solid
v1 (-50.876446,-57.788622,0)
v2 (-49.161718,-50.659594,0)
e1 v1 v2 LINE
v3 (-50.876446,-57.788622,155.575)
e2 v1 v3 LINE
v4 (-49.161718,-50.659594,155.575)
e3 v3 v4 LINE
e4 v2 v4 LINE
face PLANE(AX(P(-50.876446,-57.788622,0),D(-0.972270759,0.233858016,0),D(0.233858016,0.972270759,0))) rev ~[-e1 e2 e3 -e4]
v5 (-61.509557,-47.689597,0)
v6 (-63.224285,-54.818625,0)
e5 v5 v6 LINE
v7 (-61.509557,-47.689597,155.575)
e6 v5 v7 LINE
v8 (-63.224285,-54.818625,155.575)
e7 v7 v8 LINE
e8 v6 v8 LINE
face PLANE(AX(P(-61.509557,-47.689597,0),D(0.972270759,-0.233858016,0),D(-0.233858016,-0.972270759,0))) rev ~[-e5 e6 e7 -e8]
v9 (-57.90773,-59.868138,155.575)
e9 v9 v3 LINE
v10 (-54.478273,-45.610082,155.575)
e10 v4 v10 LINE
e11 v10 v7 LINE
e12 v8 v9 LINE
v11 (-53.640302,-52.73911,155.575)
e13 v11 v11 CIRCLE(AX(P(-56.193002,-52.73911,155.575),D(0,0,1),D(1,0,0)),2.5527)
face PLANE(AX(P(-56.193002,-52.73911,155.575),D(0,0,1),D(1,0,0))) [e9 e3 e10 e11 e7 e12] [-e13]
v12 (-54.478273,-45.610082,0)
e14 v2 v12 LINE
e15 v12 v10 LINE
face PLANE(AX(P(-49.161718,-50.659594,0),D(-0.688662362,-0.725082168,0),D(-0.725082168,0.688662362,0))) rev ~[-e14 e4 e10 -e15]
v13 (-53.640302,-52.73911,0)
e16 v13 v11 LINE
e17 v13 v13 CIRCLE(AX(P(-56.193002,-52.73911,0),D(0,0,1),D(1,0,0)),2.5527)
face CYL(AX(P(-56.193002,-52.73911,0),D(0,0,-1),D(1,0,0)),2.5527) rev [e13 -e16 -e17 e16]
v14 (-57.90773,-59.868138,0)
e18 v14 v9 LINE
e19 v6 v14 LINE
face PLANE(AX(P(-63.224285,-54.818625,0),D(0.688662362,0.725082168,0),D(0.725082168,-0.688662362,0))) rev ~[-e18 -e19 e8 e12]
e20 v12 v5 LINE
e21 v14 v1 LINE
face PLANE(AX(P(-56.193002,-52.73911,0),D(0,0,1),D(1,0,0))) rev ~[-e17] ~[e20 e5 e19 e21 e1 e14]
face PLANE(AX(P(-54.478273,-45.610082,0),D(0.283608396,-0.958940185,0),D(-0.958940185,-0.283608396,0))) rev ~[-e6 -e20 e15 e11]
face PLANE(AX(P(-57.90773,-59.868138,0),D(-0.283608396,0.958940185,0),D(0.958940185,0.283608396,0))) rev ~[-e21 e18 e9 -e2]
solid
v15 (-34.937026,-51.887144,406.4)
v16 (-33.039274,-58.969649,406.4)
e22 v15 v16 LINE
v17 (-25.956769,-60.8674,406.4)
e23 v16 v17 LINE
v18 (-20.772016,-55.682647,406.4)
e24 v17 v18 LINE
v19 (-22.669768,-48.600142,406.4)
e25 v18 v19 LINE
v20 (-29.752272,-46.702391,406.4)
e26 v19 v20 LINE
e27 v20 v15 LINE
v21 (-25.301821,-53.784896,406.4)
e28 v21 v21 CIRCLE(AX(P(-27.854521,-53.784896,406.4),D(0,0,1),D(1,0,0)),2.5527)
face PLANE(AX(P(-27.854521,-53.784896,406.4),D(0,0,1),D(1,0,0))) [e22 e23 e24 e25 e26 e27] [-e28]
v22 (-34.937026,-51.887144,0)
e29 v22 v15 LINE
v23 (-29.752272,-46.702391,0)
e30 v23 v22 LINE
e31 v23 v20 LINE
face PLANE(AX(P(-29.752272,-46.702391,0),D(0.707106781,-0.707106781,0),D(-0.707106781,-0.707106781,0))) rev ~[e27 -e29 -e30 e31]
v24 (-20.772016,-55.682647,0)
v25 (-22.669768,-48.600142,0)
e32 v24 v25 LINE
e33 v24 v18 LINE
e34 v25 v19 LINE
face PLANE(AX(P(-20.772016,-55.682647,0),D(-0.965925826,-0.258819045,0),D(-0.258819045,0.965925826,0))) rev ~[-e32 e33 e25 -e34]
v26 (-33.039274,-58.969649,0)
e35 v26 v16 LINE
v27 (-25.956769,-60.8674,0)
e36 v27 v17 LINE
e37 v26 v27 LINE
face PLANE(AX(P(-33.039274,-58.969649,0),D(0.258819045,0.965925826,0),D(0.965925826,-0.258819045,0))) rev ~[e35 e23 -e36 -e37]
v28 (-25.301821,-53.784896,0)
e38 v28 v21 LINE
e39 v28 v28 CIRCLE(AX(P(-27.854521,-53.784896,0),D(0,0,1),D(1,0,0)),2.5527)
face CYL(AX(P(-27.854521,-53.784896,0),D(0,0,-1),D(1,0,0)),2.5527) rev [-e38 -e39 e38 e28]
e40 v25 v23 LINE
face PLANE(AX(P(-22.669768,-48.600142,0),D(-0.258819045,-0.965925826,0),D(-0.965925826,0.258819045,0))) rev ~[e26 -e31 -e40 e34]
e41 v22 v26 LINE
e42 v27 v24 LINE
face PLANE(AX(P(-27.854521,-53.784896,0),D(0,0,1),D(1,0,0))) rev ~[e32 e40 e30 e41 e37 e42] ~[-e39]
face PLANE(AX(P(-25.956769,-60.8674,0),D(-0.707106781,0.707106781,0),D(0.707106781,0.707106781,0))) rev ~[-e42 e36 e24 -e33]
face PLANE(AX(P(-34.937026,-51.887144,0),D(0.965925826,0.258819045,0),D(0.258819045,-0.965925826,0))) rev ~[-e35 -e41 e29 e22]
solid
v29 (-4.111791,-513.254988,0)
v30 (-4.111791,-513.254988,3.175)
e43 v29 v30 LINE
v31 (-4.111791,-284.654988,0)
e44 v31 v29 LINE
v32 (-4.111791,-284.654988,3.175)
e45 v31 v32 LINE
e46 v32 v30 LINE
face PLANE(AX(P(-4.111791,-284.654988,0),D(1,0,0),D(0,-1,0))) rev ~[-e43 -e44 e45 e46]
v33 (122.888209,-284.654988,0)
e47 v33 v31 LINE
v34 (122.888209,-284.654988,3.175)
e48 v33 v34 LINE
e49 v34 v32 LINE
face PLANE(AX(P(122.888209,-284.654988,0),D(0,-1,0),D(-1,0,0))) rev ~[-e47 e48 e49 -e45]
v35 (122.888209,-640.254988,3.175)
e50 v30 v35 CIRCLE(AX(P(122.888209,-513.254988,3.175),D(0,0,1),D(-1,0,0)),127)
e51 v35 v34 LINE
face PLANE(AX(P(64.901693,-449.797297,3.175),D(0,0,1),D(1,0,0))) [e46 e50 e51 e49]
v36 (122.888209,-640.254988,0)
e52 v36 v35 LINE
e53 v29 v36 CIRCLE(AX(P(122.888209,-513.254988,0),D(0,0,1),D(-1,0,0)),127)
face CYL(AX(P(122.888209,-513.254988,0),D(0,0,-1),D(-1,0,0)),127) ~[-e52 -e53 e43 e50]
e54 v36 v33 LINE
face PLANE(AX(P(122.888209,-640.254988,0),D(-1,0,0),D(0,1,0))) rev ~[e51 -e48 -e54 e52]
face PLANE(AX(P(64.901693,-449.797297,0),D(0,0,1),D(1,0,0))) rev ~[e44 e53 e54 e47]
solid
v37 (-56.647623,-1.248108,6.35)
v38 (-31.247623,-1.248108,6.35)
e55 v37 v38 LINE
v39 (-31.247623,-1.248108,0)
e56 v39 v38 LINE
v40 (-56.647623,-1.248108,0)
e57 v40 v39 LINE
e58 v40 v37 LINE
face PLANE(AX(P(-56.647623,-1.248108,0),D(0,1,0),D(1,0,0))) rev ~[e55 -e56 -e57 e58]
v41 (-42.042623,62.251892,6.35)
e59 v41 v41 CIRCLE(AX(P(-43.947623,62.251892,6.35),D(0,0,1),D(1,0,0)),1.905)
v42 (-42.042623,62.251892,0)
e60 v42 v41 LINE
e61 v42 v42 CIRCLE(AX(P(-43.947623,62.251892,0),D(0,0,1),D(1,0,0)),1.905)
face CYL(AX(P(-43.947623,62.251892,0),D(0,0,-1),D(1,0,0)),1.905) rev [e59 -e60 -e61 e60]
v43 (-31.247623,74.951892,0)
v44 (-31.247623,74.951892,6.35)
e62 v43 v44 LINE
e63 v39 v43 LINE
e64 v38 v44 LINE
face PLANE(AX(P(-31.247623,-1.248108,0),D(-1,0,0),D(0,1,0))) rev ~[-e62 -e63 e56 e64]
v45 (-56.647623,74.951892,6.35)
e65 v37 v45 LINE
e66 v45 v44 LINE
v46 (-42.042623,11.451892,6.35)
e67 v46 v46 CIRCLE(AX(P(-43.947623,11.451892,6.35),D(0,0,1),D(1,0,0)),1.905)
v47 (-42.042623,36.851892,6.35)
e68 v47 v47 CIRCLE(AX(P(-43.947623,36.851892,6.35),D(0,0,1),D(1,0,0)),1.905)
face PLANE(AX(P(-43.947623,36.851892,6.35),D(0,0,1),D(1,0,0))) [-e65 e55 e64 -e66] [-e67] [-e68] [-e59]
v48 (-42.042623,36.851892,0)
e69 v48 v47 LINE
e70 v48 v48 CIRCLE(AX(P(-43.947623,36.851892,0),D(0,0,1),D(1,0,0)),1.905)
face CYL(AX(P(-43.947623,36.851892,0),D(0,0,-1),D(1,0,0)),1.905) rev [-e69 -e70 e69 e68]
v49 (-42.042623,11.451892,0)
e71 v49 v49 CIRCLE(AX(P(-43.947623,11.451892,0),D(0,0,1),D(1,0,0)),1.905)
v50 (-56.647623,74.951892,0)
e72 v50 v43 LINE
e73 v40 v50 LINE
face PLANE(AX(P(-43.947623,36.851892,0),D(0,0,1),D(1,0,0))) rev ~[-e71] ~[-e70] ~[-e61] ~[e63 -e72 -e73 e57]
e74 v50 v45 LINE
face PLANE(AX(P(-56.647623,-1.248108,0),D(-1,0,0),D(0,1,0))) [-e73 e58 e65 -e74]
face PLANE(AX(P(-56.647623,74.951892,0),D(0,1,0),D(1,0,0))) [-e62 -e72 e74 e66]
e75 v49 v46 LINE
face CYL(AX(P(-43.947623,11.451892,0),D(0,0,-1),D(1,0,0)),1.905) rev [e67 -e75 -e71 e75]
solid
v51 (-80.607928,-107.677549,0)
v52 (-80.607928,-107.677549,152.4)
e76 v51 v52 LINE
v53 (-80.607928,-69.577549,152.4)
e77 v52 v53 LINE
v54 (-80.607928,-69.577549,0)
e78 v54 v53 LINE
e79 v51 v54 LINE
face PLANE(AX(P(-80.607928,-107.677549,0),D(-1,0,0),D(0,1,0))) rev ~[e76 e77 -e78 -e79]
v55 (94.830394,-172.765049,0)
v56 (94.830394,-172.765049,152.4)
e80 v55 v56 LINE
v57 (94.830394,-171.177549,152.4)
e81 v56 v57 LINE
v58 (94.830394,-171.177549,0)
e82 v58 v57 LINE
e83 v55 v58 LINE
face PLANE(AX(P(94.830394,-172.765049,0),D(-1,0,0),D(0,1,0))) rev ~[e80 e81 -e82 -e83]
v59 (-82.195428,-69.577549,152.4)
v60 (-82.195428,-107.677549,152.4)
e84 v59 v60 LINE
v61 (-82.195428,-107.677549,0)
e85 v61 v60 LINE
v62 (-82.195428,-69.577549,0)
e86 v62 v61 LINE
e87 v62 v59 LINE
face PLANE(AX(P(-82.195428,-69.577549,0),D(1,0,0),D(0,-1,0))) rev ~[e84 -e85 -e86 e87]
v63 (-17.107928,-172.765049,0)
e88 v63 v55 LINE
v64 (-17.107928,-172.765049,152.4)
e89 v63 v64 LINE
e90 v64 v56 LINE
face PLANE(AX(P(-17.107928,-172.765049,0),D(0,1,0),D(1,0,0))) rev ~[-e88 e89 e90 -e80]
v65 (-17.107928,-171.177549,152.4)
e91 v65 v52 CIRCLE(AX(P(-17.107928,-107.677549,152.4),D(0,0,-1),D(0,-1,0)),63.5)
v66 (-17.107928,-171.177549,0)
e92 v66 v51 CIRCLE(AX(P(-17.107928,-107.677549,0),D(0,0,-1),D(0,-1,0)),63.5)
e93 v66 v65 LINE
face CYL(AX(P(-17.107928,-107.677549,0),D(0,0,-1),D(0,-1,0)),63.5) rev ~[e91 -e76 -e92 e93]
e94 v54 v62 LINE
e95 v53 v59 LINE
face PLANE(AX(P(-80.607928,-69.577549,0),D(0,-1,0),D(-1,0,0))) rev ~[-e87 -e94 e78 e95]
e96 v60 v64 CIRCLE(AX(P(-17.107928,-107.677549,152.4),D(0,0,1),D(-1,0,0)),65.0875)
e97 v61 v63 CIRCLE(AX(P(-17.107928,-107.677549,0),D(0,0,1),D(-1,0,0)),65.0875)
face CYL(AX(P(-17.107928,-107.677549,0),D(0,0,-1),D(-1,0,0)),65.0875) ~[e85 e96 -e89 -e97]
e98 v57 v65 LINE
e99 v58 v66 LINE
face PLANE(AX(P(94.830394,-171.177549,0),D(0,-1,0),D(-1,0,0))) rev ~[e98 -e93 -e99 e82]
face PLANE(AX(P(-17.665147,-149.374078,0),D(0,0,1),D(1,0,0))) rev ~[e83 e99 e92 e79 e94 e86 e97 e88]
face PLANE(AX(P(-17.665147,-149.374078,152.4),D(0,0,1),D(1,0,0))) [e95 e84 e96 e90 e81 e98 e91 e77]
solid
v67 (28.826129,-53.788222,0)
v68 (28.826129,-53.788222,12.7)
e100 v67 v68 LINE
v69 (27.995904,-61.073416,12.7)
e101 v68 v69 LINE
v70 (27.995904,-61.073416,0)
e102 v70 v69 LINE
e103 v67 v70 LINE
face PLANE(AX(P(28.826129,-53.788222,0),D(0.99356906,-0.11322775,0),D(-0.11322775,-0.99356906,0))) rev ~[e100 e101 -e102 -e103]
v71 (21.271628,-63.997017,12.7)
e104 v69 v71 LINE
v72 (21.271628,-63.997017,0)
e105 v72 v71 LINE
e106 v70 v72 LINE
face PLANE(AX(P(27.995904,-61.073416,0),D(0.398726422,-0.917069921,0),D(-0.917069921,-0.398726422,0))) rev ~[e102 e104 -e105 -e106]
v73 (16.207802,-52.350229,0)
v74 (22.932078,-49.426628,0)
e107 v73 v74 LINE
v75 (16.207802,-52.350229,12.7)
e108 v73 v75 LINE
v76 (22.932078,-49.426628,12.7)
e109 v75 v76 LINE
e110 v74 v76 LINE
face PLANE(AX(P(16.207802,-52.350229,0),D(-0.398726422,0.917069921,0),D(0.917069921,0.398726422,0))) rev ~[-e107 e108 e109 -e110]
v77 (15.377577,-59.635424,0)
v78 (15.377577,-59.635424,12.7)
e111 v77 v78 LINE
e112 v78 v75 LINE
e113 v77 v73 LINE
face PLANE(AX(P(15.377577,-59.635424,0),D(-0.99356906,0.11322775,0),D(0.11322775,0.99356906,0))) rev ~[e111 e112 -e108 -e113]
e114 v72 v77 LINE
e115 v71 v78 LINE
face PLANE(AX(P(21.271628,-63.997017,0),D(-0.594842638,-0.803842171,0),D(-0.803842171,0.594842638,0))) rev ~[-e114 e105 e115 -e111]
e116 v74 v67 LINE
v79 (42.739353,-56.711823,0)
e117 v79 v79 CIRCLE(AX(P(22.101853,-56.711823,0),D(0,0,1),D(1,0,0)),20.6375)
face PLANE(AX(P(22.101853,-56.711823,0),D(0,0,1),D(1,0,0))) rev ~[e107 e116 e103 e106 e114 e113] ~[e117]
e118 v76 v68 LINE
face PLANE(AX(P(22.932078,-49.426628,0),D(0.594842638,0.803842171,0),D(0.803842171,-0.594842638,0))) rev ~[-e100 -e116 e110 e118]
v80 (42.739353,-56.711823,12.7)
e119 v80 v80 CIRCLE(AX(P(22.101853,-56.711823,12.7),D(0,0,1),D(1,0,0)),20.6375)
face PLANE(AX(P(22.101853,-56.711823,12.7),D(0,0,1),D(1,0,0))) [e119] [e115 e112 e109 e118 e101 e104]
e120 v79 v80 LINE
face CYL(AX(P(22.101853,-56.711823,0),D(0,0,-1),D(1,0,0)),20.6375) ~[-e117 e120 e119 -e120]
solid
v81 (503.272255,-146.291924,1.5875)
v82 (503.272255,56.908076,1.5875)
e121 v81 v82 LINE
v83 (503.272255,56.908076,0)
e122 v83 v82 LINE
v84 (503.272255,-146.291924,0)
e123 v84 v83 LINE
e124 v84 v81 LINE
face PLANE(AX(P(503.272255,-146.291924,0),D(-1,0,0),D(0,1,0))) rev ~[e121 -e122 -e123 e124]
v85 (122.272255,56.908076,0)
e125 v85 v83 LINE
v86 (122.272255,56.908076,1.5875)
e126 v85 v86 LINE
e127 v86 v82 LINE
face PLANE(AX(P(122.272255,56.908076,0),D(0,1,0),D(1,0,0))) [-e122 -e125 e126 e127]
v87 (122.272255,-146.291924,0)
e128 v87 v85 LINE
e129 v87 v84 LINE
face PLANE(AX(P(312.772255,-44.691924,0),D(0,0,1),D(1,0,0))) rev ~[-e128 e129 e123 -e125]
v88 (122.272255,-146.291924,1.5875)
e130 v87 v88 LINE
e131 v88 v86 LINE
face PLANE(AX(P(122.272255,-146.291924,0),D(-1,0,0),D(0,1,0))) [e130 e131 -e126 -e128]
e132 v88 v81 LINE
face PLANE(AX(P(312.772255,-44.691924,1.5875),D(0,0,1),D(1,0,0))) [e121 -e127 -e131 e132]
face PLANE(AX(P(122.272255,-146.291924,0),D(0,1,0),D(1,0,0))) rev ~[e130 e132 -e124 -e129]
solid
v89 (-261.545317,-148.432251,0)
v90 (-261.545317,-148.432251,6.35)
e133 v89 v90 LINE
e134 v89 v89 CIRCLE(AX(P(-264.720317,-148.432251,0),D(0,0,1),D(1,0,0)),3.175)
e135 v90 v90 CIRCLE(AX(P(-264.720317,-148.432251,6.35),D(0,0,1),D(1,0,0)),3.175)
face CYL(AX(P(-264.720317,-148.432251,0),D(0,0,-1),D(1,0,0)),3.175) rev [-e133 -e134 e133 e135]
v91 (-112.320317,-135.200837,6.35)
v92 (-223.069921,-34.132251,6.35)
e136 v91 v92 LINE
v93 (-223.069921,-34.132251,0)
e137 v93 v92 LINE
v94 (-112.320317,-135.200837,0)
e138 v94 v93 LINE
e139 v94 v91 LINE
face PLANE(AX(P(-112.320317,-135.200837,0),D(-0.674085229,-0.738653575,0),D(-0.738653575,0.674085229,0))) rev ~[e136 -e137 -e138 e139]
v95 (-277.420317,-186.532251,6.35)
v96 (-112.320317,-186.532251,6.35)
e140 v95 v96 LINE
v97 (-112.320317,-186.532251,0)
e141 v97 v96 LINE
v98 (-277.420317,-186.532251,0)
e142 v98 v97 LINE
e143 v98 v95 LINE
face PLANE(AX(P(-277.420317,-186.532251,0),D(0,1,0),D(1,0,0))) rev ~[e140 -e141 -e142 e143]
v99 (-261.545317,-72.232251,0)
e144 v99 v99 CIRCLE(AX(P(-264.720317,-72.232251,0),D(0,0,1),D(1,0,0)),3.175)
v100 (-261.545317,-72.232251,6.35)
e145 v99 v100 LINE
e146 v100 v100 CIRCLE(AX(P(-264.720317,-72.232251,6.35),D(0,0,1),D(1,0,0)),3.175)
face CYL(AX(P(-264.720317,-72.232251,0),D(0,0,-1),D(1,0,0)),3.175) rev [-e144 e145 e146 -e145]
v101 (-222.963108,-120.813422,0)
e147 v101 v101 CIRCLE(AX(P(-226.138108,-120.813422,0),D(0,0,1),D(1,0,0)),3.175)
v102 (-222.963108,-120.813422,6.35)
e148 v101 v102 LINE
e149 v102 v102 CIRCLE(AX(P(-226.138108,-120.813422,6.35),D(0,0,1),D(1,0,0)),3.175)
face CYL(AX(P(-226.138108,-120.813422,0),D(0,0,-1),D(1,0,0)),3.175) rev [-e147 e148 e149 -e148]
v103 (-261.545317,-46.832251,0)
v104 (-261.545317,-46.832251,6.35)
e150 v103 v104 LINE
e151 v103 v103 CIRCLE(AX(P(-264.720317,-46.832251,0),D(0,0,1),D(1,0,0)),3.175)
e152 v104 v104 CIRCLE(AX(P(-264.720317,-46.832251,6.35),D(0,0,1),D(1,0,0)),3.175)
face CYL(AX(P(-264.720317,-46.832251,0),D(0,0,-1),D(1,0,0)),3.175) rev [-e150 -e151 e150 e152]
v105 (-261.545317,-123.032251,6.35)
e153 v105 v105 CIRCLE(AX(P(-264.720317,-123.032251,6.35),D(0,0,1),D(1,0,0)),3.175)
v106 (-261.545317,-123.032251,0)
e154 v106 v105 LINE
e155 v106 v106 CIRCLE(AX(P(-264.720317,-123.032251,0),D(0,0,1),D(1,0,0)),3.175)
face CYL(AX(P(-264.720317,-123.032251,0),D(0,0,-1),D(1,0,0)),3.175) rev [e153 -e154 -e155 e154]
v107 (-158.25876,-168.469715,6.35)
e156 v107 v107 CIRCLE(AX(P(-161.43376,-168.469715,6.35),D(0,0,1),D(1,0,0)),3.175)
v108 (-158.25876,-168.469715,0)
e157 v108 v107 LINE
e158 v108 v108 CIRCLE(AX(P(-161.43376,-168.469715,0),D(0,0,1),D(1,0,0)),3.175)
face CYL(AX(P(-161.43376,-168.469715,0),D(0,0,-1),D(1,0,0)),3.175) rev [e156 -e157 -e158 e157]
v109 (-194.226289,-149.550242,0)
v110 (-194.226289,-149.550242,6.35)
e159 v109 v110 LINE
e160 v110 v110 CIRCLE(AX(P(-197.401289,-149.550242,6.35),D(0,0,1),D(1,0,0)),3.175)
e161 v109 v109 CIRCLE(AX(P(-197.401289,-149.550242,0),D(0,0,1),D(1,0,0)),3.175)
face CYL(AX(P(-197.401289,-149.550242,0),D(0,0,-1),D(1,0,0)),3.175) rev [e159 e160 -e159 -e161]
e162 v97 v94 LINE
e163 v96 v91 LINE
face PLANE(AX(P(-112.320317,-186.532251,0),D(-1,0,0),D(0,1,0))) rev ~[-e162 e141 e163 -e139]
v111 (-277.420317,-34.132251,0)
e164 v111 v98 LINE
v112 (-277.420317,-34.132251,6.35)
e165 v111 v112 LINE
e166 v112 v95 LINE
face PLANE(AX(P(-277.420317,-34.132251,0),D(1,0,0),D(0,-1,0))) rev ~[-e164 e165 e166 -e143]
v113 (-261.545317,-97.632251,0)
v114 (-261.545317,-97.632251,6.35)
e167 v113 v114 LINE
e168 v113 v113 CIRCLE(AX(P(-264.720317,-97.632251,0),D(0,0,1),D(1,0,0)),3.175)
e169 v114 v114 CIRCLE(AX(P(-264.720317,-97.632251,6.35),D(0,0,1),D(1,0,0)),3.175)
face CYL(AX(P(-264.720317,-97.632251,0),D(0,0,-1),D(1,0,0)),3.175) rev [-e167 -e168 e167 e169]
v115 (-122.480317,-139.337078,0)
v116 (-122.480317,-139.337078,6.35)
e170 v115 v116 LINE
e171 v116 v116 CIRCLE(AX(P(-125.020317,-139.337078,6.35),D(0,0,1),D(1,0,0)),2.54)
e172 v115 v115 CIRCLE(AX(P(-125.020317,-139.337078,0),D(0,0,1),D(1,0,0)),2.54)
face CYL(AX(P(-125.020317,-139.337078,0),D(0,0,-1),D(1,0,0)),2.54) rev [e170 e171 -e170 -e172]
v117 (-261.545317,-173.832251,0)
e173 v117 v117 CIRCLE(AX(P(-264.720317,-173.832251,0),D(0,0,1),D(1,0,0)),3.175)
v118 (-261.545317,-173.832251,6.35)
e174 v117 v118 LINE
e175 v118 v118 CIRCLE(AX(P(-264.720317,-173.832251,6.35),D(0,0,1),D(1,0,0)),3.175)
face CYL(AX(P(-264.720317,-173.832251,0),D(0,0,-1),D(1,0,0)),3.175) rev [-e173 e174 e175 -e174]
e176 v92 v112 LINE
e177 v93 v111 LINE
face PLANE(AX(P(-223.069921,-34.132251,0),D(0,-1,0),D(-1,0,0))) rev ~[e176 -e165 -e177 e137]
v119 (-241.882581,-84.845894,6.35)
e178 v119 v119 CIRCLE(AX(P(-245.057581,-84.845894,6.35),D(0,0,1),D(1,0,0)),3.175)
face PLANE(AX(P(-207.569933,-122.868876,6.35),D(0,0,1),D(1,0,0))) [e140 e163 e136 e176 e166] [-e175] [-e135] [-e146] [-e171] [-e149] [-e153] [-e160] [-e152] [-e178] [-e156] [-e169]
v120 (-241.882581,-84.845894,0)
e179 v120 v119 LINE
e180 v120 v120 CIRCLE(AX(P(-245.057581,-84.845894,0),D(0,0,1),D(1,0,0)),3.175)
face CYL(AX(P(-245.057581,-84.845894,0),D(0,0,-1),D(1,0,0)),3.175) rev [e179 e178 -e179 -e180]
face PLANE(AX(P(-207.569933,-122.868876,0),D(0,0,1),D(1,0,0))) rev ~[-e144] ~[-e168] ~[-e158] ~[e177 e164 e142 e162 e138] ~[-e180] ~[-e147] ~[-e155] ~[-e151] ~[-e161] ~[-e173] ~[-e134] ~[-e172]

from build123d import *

# Parameters (mm, degrees)
F0_W      = 25.4
F0_H      = 76.2
F0_R      = 1.905
F1_DEPTH  = 6.35
F2_W      = 381
F2_H      = 203.2
F3_DEPTH  = 1.5875
F4_R      = 3.175
F4_R_2    = 2.54
F5_DEPTH  = 6.35
F7_DEPTH  = 3.175
F8_R      = 2.5527
F9_DEPTH  = 155.575
F11_DEPTH = 152.4
F12_R     = 2.5527
F13_DEPTH = 406.4
F14_R     = 20.6375
F15_DEPTH = 12.7


# Not quite as in the source:
# - a length typed as a fraction of an inch, garbled in the dataset ("3 / 203.2 mm" for 3/8 in), is restored


with BuildPart() as f1:
    # F0 (on Top) → F1 (new body)
    with BuildSketch(Plane.XY):
        with Locations((-43.9476225885, 36.8518919408)):
            Rectangle(F0_W, F0_H)
        with Locations((-43.9476225885, 11.4518919408)):
            Circle(F0_R, mode=Mode.SUBTRACT)
        with Locations((-43.9476225885, 36.8518919408)):
            Circle(F0_R, mode=Mode.SUBTRACT)
        with Locations((-43.9476225885, 62.2518919408)):
            Circle(F0_R, mode=Mode.SUBTRACT)
    extrude(amount=F1_DEPTH)


with BuildPart() as f3:
    # F2 (on Top) → F3 (new body)
    with BuildSketch(Plane.XY):
        with Locations((312.7722548485, -44.6919236064)):
            Rectangle(F2_W, F2_H)
    extrude(amount=F3_DEPTH)


with BuildPart() as f5:
    # F4 (on Top) → F5 (new body)
    with BuildSketch(Plane.XY):
        Polygon((-223.0699211359, -34.1322505951), (-277.4203166646, -34.1322505951), (-277.4203166646, -186.5322505951), (-112.3203166646, -186.5322505951), (-112.3203166646, -135.2008368701), align=None)
        with Locations((-264.7203166646, -173.8322505951)):
            Circle(F4_R, mode=Mode.SUBTRACT)
        with Locations((-197.4012885681, -149.550242086)):
            Circle(F4_R, mode=Mode.SUBTRACT)
        with Locations((-264.7203166646, -148.4322505951)):
            Circle(F4_R, mode=Mode.SUBTRACT)
        with Locations((-264.7203166646, -123.0322505951)):
            Circle(F4_R, mode=Mode.SUBTRACT)
        with Locations((-226.1381081555, -120.8134224986)):
            Circle(F4_R, mode=Mode.SUBTRACT)
        with Locations((-161.433759699, -168.4697153093)):
            Circle(F4_R, mode=Mode.SUBTRACT)
        with Locations((-125.0203166646, -139.3370777369)):
            Circle(F4_R_2, mode=Mode.SUBTRACT)
        with Locations((-264.7203166646, -97.6322505951)):
            Circle(F4_R, mode=Mode.SUBTRACT)
        with Locations((-245.0575813788, -84.8458936294)):
            Circle(F4_R, mode=Mode.SUBTRACT)
        with Locations((-264.7203166646, -72.2322505951)):
            Circle(F4_R, mode=Mode.SUBTRACT)
        with Locations((-264.7203166646, -46.8322505951)):
            Circle(F4_R, mode=Mode.SUBTRACT)
    extrude(amount=F5_DEPTH)


with BuildPart() as f7:
    # F6 (on Top) → F7 (new body)
    with BuildSketch(Plane.XY):
        with BuildLine():
            Line((122.8882094549, -284.6549875146), (-4.1117905451, -284.6549875146))
            Line((-4.1117905451, -284.6549875146), (-4.1117905451, -513.2549875146))
            ThreePointArc((-4.1117905451, -513.2549875146), (33.0856482442, -603.0575487253), (122.8882094549, -640.2549875146))
            Line((122.8882094549, -640.2549875146), (122.8882094549, -513.2549875146))
            Line((122.8882094549, -513.2549875146), (122.8882094549, -284.6549875146))
        make_face()
    extrude(amount=F7_DEPTH)


with BuildPart() as f9:
    # F8 (on Top) → F9 (new body)
    with BuildSketch(Plane.XY):
        Polygon((-57.9077300241, -59.8681378041), (-50.8764464785, -57.7886222274), (-49.1617180227, -50.6595942672), (-54.4782731125, -45.6100818839), (-61.5095566582, -47.6895974606), (-63.224285114, -54.8186254207), align=None)
        with Locations((-56.1930015683, -52.739109844)):
            Circle(F8_R, mode=Mode.SUBTRACT)
    extrude(amount=F9_DEPTH)


with BuildPart() as f11:
    # F10 (on Top) → F11 (new body)
    with BuildSketch(Plane.XY):
        with BuildLine():
            ThreePointArc((-17.1079281718, -171.1775491238), (-62.0092087771, -152.5788297291), (-80.6079281718, -107.6775491238))
            Line((-80.6079281718, -107.6775491238), (-80.6079281718, -69.5775491238))
            Line((-80.6079281718, -69.5775491238), (-82.1954281718, -69.5775491238))
            Line((-82.1954281718, -69.5775491238), (-82.1954281718, -107.6775491238))
            ThreePointArc((-82.1954281718, -107.6775491238), (-63.1317407922, -153.7013617442), (-17.1079281718, -172.7650491238))
            Line((-17.1079281718, -172.7650491238), (94.8303937912, -172.7650491238))
            Line((94.8303937912, -172.7650491238), (94.8303937912, -171.1775491238))
            Line((94.8303937912, -171.1775491238), (-17.1079281718, -171.1775491238))
        make_face()
    extrude(amount=F11_DEPTH)


with BuildPart() as f13:
    # F12 (on Top) → F13 (new body)
    with BuildSketch(Plane.XY):
        Polygon((-25.9567694114, -60.8674003933), (-20.7720161226, -55.6826471044), (-22.6697675386, -48.6001423994), (-29.7522722436, -46.7023909833), (-34.9370255325, -51.8871442722), (-33.0392741164, -58.9696489772), align=None)
        with Locations((-27.8545208275, -53.7848956883)):
            Circle(F12_R, mode=Mode.SUBTRACT)
    extrude(amount=F13_DEPTH)


with BuildPart() as f15:
    # F14 (on Top) → F15 (new body)
    with BuildSketch(Plane.XY):
        with Locations((22.1018530428, -56.7118227482)):
            Circle(F14_R)
        Polygon((28.8261292295, -53.7882216984), (27.9959039159, -61.073416223), (21.2716277292, -63.9970172728), (15.3775768562, -59.635423798), (16.2078021698, -52.3502292734), (22.9320783565, -49.4266282235), align=None, mode=Mode.SUBTRACT)
    extrude(amount=F15_DEPTH)


solid = Compound([f1.part, f3.part, f5.part, f7.part, f9.part, f11.part, f13.part, f15.part])
